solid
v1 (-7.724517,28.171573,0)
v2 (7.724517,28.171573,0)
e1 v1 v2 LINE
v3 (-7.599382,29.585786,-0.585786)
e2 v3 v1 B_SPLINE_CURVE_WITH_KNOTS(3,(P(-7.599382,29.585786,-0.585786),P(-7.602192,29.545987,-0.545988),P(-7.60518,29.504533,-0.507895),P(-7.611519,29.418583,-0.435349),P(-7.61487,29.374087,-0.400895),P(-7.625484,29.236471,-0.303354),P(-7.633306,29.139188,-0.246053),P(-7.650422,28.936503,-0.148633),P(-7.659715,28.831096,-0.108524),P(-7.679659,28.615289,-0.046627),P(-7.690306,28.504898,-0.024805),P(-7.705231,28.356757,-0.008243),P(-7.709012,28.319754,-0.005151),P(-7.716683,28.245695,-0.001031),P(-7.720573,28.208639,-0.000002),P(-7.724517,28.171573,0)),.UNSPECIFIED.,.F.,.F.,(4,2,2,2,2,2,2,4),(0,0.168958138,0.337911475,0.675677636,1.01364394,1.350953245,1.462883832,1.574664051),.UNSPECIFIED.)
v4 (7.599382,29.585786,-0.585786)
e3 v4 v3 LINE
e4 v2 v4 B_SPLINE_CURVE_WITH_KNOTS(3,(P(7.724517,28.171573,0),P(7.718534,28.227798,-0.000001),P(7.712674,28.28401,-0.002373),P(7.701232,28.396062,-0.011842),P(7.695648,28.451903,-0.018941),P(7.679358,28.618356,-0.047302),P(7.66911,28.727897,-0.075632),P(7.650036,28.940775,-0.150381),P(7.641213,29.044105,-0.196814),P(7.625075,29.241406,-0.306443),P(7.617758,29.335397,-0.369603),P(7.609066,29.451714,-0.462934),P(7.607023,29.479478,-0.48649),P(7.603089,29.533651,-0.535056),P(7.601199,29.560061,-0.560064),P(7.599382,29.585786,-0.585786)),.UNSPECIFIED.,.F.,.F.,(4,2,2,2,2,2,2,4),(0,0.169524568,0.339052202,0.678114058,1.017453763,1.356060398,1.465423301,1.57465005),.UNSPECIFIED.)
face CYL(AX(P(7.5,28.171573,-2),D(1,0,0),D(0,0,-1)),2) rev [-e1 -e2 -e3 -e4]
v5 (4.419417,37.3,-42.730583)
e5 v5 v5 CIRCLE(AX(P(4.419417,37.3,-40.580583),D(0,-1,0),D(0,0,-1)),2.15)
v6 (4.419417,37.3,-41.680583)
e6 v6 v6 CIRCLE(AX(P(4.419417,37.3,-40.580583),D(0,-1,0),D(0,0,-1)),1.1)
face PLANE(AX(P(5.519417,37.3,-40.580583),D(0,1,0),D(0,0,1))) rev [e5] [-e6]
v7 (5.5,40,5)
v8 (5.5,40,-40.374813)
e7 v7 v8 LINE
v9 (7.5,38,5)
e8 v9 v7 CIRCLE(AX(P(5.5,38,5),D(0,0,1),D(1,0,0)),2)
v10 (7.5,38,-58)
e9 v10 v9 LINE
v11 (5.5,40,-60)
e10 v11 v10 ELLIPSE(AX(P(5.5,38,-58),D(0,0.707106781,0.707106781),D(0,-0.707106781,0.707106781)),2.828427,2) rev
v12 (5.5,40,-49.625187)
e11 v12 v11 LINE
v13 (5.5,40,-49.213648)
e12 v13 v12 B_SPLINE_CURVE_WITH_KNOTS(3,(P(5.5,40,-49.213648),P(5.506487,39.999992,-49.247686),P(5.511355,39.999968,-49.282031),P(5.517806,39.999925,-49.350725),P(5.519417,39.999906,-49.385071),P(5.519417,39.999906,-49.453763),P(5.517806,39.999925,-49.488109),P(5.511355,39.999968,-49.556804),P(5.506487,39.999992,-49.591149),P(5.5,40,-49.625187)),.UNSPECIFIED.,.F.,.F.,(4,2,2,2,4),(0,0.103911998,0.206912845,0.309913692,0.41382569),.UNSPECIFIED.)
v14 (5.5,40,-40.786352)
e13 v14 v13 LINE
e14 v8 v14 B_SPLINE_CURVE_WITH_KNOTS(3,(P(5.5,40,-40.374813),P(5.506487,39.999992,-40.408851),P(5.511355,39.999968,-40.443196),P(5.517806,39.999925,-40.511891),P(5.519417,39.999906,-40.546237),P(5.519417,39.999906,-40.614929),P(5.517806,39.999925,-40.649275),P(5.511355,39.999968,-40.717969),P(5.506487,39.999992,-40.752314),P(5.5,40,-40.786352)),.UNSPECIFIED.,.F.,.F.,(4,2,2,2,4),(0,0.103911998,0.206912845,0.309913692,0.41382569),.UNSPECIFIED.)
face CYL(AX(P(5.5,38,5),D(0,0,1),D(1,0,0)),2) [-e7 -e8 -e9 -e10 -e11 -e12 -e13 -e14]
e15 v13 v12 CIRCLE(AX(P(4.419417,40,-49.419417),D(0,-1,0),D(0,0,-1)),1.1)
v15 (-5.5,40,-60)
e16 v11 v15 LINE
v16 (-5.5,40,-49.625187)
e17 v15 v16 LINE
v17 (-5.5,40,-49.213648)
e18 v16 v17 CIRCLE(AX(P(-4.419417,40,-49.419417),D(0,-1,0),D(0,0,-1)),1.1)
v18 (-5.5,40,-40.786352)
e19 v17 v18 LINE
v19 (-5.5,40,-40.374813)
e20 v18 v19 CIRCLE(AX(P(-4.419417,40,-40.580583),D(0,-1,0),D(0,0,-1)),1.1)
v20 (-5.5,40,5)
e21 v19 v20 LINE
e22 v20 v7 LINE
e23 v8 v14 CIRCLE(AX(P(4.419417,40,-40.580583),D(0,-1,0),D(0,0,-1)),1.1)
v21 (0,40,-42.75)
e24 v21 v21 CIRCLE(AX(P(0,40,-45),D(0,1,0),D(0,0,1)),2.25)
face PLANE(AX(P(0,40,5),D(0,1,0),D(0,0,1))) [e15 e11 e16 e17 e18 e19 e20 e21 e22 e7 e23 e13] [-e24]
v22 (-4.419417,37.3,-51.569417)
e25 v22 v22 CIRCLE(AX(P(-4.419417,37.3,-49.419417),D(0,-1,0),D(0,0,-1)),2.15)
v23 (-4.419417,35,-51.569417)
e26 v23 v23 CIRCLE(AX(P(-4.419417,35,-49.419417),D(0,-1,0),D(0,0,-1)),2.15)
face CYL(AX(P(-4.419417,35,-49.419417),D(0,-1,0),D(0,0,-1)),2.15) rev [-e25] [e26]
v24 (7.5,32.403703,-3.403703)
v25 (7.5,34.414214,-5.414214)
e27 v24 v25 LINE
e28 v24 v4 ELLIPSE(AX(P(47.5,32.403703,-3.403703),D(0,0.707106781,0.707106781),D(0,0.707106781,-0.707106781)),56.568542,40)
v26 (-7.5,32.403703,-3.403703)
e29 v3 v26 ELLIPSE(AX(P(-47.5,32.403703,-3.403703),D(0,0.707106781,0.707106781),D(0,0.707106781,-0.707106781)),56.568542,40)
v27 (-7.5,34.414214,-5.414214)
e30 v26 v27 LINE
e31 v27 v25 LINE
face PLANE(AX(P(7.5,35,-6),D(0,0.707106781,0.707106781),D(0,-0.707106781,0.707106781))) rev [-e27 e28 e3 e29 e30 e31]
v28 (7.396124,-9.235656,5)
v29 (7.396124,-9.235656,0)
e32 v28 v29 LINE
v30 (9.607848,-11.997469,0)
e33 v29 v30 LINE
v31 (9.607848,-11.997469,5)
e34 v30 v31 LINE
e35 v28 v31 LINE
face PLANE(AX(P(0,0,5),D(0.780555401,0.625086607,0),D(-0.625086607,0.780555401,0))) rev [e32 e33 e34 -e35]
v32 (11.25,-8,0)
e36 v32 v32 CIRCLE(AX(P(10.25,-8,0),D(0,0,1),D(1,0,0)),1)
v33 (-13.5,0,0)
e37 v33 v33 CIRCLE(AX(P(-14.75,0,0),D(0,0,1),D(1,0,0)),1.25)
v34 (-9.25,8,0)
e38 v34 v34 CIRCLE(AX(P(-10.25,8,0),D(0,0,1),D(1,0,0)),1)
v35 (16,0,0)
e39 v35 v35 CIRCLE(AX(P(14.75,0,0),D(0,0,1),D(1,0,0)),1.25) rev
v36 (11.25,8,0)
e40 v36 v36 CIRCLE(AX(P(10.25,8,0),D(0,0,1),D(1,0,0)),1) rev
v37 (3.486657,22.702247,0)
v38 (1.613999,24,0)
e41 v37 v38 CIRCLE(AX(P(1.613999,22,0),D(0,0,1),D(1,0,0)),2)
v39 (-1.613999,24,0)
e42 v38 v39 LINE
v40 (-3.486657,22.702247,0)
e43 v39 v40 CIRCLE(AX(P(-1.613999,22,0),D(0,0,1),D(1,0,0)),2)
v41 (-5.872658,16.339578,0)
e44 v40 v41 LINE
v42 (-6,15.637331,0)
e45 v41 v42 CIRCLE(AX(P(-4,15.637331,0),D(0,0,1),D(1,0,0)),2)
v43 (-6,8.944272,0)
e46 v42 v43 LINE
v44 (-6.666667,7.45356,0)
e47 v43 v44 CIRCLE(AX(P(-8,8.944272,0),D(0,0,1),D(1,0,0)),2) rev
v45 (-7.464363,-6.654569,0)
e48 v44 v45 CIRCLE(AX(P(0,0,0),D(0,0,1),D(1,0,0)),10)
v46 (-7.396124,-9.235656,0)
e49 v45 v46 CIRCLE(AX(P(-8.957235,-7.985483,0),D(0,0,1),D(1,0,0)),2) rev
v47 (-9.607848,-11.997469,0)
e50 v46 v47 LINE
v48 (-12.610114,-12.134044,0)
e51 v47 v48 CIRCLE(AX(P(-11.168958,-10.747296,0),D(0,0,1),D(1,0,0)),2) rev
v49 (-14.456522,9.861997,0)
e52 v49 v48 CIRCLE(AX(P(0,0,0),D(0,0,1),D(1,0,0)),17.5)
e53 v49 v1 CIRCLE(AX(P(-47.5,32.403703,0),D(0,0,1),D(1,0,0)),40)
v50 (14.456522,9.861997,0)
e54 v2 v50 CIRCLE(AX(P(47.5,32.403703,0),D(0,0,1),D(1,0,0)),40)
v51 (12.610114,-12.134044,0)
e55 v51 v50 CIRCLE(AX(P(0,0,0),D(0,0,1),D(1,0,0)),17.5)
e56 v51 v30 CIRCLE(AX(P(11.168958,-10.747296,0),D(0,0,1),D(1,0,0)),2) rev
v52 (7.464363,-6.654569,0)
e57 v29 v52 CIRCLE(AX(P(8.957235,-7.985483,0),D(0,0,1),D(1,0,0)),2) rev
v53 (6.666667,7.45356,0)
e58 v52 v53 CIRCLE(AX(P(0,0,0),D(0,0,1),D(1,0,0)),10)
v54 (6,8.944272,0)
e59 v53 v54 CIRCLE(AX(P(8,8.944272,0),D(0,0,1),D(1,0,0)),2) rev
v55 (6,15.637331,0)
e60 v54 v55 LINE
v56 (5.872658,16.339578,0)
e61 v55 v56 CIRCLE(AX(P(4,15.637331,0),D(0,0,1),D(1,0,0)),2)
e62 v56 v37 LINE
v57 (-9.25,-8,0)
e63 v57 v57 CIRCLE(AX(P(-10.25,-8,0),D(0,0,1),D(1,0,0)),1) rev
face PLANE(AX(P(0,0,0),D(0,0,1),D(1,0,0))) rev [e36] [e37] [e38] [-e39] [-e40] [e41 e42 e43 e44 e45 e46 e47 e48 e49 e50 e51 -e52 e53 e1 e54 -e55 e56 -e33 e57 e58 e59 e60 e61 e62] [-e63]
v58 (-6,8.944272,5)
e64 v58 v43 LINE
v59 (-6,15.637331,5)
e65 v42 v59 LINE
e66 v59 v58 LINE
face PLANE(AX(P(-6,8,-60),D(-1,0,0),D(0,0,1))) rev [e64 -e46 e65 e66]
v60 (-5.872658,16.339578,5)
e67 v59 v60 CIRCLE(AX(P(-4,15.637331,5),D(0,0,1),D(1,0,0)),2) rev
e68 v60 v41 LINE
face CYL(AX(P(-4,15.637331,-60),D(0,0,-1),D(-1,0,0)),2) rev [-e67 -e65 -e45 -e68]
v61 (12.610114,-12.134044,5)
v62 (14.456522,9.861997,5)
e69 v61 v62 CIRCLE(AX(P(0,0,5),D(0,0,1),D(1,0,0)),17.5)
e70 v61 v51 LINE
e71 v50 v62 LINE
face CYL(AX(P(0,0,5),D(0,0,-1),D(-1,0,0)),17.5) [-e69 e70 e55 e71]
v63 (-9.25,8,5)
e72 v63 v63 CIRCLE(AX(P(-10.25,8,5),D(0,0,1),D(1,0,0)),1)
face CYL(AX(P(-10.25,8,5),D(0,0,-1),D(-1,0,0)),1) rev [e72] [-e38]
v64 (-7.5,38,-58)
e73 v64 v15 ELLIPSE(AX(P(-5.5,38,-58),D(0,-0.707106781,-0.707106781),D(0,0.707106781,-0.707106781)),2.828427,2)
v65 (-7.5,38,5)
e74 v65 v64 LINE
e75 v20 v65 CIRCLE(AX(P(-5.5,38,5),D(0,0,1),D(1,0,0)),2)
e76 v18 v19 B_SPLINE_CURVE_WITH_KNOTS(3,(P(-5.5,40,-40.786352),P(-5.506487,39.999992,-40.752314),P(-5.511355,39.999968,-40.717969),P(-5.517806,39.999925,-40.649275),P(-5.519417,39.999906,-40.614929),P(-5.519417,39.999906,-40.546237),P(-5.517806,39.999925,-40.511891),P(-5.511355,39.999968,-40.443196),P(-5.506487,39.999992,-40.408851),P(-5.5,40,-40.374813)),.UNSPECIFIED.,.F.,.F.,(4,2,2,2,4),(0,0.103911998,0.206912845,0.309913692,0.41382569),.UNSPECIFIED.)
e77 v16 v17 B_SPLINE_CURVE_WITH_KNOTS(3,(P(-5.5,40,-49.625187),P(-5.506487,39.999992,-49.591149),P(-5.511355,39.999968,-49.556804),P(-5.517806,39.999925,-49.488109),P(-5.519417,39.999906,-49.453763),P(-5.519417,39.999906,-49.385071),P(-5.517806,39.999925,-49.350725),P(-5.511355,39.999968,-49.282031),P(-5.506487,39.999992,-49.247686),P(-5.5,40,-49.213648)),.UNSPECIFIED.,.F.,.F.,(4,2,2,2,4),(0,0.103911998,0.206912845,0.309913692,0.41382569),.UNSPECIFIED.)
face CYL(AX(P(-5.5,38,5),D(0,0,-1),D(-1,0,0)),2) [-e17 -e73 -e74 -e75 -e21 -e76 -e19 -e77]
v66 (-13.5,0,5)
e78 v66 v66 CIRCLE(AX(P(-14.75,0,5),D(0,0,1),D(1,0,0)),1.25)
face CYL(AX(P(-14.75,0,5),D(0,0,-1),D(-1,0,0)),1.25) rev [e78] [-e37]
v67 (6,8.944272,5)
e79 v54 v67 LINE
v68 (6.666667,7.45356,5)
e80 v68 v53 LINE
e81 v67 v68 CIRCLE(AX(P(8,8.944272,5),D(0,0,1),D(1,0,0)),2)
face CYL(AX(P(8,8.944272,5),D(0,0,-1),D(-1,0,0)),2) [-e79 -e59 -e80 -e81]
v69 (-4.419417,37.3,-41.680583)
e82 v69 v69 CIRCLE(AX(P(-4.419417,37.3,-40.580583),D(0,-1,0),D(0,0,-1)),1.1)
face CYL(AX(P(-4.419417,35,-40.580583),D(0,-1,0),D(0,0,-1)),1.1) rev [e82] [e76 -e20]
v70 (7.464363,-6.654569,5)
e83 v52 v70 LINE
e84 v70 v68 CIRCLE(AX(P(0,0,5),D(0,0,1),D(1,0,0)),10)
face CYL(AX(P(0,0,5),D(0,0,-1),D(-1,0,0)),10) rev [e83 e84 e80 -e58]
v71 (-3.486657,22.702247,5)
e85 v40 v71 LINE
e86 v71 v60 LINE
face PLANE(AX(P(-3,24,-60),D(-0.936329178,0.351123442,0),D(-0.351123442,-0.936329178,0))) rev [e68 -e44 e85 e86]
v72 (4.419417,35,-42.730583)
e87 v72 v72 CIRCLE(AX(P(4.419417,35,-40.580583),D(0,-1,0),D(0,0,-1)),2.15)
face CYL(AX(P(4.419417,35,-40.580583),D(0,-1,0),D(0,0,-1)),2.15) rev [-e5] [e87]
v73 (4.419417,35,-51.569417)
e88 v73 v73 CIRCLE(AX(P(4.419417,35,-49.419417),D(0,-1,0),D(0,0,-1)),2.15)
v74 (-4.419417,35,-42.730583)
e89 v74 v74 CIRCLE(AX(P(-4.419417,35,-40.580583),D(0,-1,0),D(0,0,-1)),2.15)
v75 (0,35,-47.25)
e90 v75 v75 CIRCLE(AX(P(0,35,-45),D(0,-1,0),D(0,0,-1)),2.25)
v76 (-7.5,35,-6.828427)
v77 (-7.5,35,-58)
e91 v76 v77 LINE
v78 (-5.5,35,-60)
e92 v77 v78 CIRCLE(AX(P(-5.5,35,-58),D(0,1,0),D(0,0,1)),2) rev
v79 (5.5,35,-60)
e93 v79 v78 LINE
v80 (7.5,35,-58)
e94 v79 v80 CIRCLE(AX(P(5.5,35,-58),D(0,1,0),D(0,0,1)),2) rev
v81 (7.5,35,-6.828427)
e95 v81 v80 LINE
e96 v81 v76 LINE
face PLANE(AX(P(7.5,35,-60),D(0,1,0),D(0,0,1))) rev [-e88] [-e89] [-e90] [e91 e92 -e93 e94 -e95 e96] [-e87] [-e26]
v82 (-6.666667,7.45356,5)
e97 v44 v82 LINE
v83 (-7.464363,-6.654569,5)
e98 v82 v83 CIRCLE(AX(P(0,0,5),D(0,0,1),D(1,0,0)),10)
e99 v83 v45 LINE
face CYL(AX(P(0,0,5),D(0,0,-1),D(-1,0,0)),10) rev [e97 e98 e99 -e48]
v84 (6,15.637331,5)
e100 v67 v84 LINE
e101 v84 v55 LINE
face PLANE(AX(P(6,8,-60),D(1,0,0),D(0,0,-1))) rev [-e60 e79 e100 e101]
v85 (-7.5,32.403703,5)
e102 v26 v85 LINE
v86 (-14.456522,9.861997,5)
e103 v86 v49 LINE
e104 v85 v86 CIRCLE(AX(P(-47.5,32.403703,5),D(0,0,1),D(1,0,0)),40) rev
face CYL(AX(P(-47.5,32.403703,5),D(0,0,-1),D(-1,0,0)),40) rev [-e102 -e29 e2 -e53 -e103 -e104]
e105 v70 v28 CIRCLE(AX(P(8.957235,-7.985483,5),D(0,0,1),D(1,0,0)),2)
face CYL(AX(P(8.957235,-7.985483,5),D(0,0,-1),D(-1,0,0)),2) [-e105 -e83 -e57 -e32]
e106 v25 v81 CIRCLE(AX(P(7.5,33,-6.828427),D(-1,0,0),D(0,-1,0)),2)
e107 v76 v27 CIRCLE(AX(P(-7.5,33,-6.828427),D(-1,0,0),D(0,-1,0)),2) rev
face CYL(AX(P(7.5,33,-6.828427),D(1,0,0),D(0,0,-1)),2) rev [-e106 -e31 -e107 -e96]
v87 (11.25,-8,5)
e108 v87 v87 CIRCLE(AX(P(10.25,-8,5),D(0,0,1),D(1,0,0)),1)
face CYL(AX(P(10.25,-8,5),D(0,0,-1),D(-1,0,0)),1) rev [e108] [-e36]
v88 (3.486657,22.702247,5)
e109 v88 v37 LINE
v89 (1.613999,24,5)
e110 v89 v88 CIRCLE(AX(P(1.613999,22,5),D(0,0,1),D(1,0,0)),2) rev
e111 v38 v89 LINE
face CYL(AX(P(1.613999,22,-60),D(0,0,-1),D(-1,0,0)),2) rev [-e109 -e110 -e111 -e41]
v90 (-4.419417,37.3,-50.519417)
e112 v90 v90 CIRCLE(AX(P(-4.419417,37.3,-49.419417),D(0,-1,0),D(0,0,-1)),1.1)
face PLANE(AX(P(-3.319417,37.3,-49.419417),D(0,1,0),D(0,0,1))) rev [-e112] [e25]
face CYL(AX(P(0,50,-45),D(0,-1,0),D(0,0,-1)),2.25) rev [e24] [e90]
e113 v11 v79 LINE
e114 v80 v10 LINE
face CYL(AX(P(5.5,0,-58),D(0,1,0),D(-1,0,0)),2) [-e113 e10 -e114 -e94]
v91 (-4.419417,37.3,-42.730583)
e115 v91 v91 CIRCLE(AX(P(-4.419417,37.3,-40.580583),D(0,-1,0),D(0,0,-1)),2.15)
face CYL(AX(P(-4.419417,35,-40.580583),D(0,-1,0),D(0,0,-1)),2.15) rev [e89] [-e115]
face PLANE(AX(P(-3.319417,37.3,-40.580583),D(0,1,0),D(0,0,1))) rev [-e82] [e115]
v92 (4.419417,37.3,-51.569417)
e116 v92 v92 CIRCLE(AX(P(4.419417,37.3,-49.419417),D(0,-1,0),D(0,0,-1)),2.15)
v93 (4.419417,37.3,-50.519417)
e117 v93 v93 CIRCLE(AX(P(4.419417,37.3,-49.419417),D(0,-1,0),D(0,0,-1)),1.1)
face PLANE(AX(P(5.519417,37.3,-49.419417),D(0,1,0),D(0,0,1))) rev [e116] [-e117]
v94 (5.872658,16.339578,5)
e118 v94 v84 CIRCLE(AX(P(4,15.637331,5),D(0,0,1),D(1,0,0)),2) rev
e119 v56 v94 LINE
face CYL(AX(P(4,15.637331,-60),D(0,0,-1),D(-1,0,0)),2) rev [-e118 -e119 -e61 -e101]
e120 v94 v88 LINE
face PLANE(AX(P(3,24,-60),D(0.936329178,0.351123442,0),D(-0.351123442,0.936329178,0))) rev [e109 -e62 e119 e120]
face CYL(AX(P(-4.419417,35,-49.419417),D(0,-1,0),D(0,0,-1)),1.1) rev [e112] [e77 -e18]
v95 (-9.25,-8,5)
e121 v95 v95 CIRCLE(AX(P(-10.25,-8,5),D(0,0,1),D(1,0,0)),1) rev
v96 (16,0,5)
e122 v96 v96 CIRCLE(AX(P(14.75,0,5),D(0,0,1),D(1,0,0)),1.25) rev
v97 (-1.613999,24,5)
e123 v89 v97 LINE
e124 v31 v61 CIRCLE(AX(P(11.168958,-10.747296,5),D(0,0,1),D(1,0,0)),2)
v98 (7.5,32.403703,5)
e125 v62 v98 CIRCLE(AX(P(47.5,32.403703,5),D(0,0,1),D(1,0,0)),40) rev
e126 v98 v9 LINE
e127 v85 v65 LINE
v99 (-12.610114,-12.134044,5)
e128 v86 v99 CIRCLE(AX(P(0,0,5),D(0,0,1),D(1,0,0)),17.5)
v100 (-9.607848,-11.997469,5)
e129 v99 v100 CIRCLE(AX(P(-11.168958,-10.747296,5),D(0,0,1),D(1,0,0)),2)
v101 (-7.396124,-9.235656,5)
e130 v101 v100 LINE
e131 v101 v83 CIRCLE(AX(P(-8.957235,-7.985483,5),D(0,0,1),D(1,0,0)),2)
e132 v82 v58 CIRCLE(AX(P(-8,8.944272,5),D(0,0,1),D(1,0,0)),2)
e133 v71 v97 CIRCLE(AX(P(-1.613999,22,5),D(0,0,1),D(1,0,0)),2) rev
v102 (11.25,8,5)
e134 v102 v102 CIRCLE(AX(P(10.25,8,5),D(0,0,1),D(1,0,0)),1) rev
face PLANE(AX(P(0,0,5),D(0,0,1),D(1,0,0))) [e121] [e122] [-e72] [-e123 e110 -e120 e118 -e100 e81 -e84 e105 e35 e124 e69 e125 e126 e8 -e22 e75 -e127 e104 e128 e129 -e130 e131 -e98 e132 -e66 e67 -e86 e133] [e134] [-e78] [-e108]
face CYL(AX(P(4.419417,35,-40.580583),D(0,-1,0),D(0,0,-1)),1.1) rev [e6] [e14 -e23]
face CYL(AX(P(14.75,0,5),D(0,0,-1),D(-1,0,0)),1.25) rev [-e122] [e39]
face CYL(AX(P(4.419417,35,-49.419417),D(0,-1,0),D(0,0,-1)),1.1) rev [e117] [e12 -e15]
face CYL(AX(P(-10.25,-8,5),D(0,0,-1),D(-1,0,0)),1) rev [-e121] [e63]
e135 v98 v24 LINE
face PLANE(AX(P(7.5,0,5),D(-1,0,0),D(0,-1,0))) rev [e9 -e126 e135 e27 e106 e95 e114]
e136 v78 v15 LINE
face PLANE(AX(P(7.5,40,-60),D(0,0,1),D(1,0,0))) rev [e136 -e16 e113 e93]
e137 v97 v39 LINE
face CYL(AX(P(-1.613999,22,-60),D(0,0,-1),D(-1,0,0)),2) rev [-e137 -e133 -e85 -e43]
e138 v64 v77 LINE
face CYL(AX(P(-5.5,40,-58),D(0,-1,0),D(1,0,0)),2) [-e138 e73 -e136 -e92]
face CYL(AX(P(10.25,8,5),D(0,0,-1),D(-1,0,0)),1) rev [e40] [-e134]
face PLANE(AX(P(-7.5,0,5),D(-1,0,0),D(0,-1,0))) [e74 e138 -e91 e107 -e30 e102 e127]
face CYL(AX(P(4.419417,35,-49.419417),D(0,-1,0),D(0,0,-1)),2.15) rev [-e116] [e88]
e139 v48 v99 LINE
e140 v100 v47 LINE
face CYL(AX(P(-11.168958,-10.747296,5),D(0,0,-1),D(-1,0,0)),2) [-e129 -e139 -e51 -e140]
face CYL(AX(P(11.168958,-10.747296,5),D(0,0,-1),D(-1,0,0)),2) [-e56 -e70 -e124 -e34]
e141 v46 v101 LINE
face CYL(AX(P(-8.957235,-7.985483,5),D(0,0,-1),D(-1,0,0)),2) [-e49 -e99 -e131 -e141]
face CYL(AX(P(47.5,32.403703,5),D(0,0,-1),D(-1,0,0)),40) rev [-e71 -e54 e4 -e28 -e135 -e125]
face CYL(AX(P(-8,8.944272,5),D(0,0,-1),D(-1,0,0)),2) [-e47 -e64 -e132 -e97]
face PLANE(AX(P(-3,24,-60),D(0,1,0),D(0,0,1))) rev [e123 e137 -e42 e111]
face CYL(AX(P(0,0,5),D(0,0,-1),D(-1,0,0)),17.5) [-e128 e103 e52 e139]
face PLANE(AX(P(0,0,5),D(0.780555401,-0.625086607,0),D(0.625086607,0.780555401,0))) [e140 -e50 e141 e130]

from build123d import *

# Parameters (mm, degrees)
SKETCH_1_R                   = 1
SKETCH_1_R_2                 = 1.25
EXTRUDE_1_DEPTH              = 5
EXTRUDE_2_DEPTH              = 7.5
SKETCH_5_R                   = 2.25
CUT_EXTRUDE_1_DEPTH          = 15
FILLET_2_R                   = 40
HOLE_WIZARD_M2_1_D           = 2.2
HOLE_WIZARD_M2_1_CBORE_D     = 4.3
HOLE_WIZARD_M2_1_CBORE_DEPTH = 2.3
CUT_EXTRUDE_2_DEPTH          = 79.302298817
FILLET_1_R                   = 2


with BuildPart() as part:
    # 草图1 → 凸台-拉伸1 (new body)
    # profile 1 of 2: a face of its own
    with BuildSketch(Plane.XY):
        with BuildLine():
            ThreePointArc((7.5, 15.811388301), (0, 17.5), (-7.5, 15.811388301))
            ThreePointArc((-7.5, 15.811388301), (-17.382056071, 2.028331029), (-10.939015625, -13.659719512))
            Line((-10.939015625, -13.659719512), (-6.250866071, -7.805554007))
            ThreePointArc((-6.250866071, -7.805554007), (-4.329626963, 9.01411839), (10, 0))
            ThreePointArc((10, 0), (9.01411839, -4.329626963), (6.250866071, -7.805554007))
            Line((6.250866071, -7.805554007), (10.939015625, -13.659719512))
            ThreePointArc((10.939015625, -13.659719512), (15.774707183, -7.576847186), (17.5, 0))
            ThreePointArc((17.5, 0), (14.790199458, 9.354143467), (7.5, 15.811388301))
        make_face()
        with Locations((-10.25, -8)):
            Circle(SKETCH_1_R, mode=Mode.SUBTRACT)
        with Locations((-14.75, 0)):
            Circle(SKETCH_1_R_2, mode=Mode.SUBTRACT)
        with Locations((-10.25, 8)):
            Circle(SKETCH_1_R, mode=Mode.SUBTRACT)
        with Locations((10.25, -8)):
            Circle(SKETCH_1_R, mode=Mode.SUBTRACT)
        with Locations((14.75, 0)):
            Circle(SKETCH_1_R_2, mode=Mode.SUBTRACT)
        with Locations((10.25, 8)):
            Circle(SKETCH_1_R, mode=Mode.SUBTRACT)
    # profile 2 of 2: a face of its own
    with BuildSketch(Plane.XY):
        with BuildLine():
            Line((-7.5, 40), (-7.5, 15.811388301))
            ThreePointArc((-7.5, 15.811388301), (0, 17.5), (7.5, 15.811388301))
            Line((7.5, 15.811388301), (7.5, 40))
            Line((7.5, 40), (-7.5, 40))
        make_face()
    extrude(amount=EXTRUDE_1_DEPTH)

    # 草图3 → 凸台-拉伸2 (add, symmetric)
    with BuildSketch(Plane(origin=(0, 0, 0), x_dir=(0, 0, -1), z_dir=(1, 0, 0))):
        Polygon((0, 40), (60, 40), (60, 35), (6, 35), (0, 29), align=None)
    extrude(amount=EXTRUDE_2_DEPTH, both=True)

    # 草图5 → 切除-拉伸1 (cut)
    with BuildSketch(Plane.XZ.offset(-35)):
        with Locations(Location((0, -45, 0), (0, 0, 270))):
            Circle(SKETCH_5_R)
    extrude(amount=-CUT_EXTRUDE_1_DEPTH, mode=Mode.SUBTRACT)

    # 圆角2
    # the kernel refuses this fillet: 40 mm, written as the material it adds along each edge
    with BuildSketch(Plane(origin=(-7.5, 15.811388301, -41.480787978), x_dir=(-0.759976311594863, -0.6499507718394276, 0), z_dir=(0, 0, 1))) as fillet_2_piece_1_section:
        with BuildLine():
            CenterArc((19.614864399, -38.607797373), FILLET_2_R, 105.160956859, 34.301152757)
            Line((-10.784188065, -12.6097665), (0, 0))
            ThreePointArc((0, 0), (4.576801693, -0.609088649), (9.153603386, 0))
        make_face()
    fillet_2_piece_1 = extrude(amount=46.480787978, mode=Mode.PRIVATE)
    fillet_2_piece_1 = split(fillet_2_piece_1, bisect_by=Plane(origin=(-7.11257259, 31.242526898, 0), z_dir=(0, 0, -1)), keep=Keep.TOP, mode=Mode.PRIVATE)
    fillet_2_piece_1 = split(fillet_2_piece_1, bisect_by=Plane(origin=(-7.11257259, 30.681895174, -1.681895174), z_dir=(0, 0.7071067811865467, 0.7071067811865486)), keep=Keep.TOP, mode=Mode.PRIVATE)
    add(fillet_2_piece_1)
    with BuildSketch(Plane(origin=(-7.5, 15.811388301, 0), x_dir=(-0.7599763115948637, -0.6499507718394266, 0), z_dir=(0, 0, 1))) as fillet_2_piece_2_section:
        with BuildLine():
            CenterArc((19.614864399, -38.607797373), FILLET_2_R, 105.160956859, 34.301152757)
            Line((-10.784188065, -12.6097665), (0, 0))
            ThreePointArc((0, 0), (4.576801693, -0.609088649), (9.153603386, 0))
        make_face()
    fillet_2_piece_2 = extrude(amount=5, mode=Mode.PRIVATE)
    fillet_2_piece_2 = split(fillet_2_piece_2, bisect_by=Plane(origin=(-9.04323472, 22.224032405, 6.775967595), z_dir=(0, -0.7071067811865467, -0.7071067811865486)), keep=Keep.TOP, mode=Mode.PRIVATE)
    add(fillet_2_piece_2)
    with BuildSketch(Plane(origin=(-7.5, 15.811388301, 0), x_dir=(-0.7599763115948637, -0.6499507718394266, 0), z_dir=(0, 0, 1))) as fillet_2_piece_3_section:
        with BuildLine():
            CenterArc((19.614864399, -38.607797373), FILLET_2_R, 105.160956859, 34.301152757)
            Line((-10.784188065, -12.6097665), (0, 0))
            ThreePointArc((0, 0), (4.576801693, -0.609088649), (9.153603386, 0))
        make_face()
    fillet_2_piece_3 = extrude(amount=5, mode=Mode.PRIVATE)
    fillet_2_piece_3 = split(fillet_2_piece_3, bisect_by=Plane(origin=(-7.203009065, 27.482958496, 1.517041504), z_dir=(0, 0.7071067811865467, 0.7071067811865486)), keep=Keep.TOP, mode=Mode.PRIVATE)
    add(fillet_2_piece_3)
    with BuildSketch(Plane(origin=(7.5, 15.811388301, -41.480787978), x_dir=(0.7599763115948623, -0.6499507718394282, 0), z_dir=(0, 0, 1))) as fillet_2_piece_4_section:
        with BuildLine():
            CenterArc((19.614864399, 38.607797373), FILLET_2_R, 220.537890384, 34.301152757)
            Line((-10.784188065, 12.6097665), (0, 0))
            ThreePointArc((0, 0), (4.576801693, 0.609088649), (9.153603386, 0))
        make_face()
    fillet_2_piece_4 = extrude(amount=46.480787978, mode=Mode.PRIVATE)
    fillet_2_piece_4 = split(fillet_2_piece_4, bisect_by=Plane(origin=(7.11257259, 31.242526898, 0), z_dir=(0, 0, -1)), keep=Keep.TOP, mode=Mode.PRIVATE)
    fillet_2_piece_4 = split(fillet_2_piece_4, bisect_by=Plane(origin=(7.11257259, 30.681895174, -1.681895174), z_dir=(0, 0.7071067811865467, 0.7071067811865486)), keep=Keep.TOP, mode=Mode.PRIVATE)
    add(fillet_2_piece_4)
    with BuildSketch(Plane(origin=(7.5, 15.811388301, 0), x_dir=(0.7599763115948623, -0.6499507718394282, 0), z_dir=(0, 0, 1))) as fillet_2_piece_5_section:
        with BuildLine():
            CenterArc((19.614864399, 38.607797373), FILLET_2_R, 220.537890384, 34.301152757)
            Line((-10.784188065, 12.6097665), (0, 0))
            ThreePointArc((0, 0), (4.576801693, 0.609088649), (9.153603386, 0))
        make_face()
    fillet_2_piece_5 = extrude(amount=5, mode=Mode.PRIVATE)
    fillet_2_piece_5 = split(fillet_2_piece_5, bisect_by=Plane(origin=(9.04323472, 22.224032405, 6.775967595), z_dir=(0, -0.7071067811865467, -0.7071067811865486)), keep=Keep.TOP, mode=Mode.PRIVATE)
    add(fillet_2_piece_5)
    with BuildSketch(Plane(origin=(7.5, 15.811388301, 0), x_dir=(0.7599763115948623, -0.6499507718394282, 0), z_dir=(0, 0, 1))) as fillet_2_piece_6_section:
        with BuildLine():
            CenterArc((19.614864399, 38.607797373), FILLET_2_R, 220.537890384, 34.301152757)
            Line((-10.784188065, 12.6097665), (0, 0))
            ThreePointArc((0, 0), (4.576801693, 0.609088649), (9.153603386, 0))
        make_face()
    fillet_2_piece_6 = extrude(amount=5, mode=Mode.PRIVATE)
    fillet_2_piece_6 = split(fillet_2_piece_6, bisect_by=Plane(origin=(7.203009065, 27.482958496, 1.517041504), z_dir=(0, 0.7071067811865467, 0.7071067811865486)), keep=Keep.TOP, mode=Mode.PRIVATE)
    add(fillet_2_piece_6)

    # M2 六角圆柱头螺钉的柱形沉头孔1 (through all)
    with Locations(Plane(origin=(0, 35, 0), x_dir=(-1, 0, 0), z_dir=(0, -1, 0))):
        with Locations((4.419417382, 40.580582618), (-4.419417382, 40.580582618), (-4.419417382, 49.419417382), (4.419417382, 49.419417382)):
            CounterBoreHole(HOLE_WIZARD_M2_1_D / 2, HOLE_WIZARD_M2_1_CBORE_D / 2, HOLE_WIZARD_M2_1_CBORE_DEPTH)

    # 草图9 → 切除-拉伸2 (cut, through all)
    with BuildSketch(Plane.XY.offset(5)):
        Polygon((-3, 24), (-6, 16), (-6, 8), (6, 8), (6, 16), (3, 24), align=None)
    extrude(amount=-CUT_EXTRUDE_2_DEPTH, mode=Mode.SUBTRACT)

    # 圆角1
    fillet_1_edges = [part.edges().sort_by_distance(p)[0] for p in [
        (10.939015625, -13.659719512, 2.5),
        (6.250866071, -7.805554007, 2.5),
        (-6.250866071, -7.805554007, 2.5),
        (-10.939015625, -13.659719512, 2.5),
        (-7.5, 40, -27.5),
        (7.5, 40, -27.5),
        (0, 29, 0),
        (0, 35, -6),
        (-7.5, 37.5, -60),
        (7.5, 37.5, -60),
        (-6, 8, 2.5),
        (6, 8, 2.5),
        (6, 16, 2.5),
        (3, 24, 2.5),
        (-6, 16, 2.5),
        (-3, 24, 2.5),
    ]]
    fillet(fillet_1_edges, radius=FILLET_1_R)


solid = part.part
